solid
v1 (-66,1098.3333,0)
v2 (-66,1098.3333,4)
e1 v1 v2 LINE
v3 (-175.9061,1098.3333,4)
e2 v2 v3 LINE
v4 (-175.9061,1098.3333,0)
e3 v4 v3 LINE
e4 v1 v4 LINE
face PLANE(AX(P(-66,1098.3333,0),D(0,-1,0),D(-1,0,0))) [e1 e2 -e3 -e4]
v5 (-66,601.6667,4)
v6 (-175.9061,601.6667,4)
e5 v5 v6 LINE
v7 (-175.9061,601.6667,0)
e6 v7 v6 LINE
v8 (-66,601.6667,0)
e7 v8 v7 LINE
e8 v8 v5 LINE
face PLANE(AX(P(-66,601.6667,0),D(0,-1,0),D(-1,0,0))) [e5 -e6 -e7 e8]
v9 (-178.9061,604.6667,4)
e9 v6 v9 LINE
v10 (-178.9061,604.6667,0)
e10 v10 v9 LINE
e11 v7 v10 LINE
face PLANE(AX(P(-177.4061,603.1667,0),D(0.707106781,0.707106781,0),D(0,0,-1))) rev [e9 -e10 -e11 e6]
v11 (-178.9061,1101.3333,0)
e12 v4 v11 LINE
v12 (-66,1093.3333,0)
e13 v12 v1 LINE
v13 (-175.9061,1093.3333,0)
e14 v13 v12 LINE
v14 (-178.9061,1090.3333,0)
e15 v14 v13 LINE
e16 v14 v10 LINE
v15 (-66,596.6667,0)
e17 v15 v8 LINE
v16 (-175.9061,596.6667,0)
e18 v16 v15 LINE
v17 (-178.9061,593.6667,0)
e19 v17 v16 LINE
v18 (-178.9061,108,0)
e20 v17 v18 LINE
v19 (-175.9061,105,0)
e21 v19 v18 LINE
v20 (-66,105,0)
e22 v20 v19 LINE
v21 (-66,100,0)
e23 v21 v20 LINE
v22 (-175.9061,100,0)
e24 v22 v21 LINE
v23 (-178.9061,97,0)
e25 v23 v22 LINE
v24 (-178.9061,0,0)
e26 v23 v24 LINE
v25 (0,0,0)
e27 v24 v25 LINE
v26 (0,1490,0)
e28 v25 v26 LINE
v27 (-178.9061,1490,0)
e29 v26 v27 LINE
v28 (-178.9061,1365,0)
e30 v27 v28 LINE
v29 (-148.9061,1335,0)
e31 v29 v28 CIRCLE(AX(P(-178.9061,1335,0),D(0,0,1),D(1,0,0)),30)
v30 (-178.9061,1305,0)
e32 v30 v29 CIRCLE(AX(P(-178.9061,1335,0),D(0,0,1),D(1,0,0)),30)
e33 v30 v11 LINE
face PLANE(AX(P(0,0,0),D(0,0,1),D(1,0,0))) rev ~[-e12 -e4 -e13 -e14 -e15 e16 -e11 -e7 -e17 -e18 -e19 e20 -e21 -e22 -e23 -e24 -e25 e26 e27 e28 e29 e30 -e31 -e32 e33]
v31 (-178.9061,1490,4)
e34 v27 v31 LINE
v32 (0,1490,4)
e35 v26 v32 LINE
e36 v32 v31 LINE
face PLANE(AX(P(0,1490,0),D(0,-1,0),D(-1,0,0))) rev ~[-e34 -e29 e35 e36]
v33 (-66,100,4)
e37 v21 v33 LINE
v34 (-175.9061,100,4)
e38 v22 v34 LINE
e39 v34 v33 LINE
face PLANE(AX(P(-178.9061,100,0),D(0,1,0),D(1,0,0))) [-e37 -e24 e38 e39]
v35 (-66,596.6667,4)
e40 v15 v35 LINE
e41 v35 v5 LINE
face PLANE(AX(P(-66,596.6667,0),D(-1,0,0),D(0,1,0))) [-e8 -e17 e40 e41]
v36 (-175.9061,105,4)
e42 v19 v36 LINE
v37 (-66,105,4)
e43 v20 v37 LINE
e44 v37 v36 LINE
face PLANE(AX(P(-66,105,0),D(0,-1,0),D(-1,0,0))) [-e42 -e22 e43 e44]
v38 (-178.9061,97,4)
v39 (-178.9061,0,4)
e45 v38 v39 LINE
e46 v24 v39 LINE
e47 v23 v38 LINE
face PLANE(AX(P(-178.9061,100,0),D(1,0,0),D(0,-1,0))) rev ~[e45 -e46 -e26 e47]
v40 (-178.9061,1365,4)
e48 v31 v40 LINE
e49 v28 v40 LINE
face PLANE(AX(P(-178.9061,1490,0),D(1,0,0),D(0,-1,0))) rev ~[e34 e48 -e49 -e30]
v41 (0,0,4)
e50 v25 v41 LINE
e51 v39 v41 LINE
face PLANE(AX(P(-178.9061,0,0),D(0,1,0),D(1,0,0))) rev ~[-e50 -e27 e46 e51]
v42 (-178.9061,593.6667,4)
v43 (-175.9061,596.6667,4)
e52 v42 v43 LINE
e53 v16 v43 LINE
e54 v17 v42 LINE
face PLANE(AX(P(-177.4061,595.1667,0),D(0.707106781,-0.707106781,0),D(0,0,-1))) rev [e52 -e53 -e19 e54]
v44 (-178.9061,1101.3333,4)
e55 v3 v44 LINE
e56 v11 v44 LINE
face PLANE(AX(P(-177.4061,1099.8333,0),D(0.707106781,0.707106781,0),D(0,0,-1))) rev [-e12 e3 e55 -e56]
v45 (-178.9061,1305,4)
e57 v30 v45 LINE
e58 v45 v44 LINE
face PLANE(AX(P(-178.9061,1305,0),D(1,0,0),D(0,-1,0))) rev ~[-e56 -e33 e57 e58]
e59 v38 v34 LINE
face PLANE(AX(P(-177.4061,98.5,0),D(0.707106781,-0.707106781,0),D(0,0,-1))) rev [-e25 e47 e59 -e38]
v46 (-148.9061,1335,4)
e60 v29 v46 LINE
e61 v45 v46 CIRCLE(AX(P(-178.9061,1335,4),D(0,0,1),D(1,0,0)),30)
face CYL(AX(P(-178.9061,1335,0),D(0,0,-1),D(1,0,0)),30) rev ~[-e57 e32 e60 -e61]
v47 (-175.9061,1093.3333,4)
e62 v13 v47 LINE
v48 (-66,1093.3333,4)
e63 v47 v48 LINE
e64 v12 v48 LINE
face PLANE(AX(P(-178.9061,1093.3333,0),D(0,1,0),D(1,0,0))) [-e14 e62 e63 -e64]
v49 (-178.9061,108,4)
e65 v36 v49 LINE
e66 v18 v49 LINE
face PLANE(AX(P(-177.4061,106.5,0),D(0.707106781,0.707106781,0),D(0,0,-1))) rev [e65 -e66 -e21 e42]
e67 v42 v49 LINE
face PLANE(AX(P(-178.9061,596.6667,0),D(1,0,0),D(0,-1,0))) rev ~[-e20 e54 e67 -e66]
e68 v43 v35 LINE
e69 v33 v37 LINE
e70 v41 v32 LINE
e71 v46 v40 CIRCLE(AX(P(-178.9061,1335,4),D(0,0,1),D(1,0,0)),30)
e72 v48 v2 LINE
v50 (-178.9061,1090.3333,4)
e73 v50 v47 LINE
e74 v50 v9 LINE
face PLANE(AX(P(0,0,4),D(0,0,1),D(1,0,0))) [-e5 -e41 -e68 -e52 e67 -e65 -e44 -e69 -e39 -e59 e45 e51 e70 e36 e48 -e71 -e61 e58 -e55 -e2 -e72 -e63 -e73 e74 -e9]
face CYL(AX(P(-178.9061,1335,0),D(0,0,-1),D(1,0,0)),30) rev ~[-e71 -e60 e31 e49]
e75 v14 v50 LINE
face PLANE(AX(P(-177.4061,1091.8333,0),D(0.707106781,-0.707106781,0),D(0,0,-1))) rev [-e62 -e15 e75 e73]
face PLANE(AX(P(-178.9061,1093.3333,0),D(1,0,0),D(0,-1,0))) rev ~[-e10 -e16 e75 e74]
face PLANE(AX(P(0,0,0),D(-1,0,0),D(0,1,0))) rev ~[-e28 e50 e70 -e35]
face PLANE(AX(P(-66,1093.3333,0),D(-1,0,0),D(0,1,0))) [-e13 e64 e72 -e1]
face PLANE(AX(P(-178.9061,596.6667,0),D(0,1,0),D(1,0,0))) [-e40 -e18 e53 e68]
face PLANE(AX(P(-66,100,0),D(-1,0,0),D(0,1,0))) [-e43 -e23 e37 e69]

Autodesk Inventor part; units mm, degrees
ref_plane "YZ Plane" through (0, 0, 0) normal (1, 0, 0) x (0, 1, 0)
ref_plane "XZ Plane" through (0, 0, 0) normal (0, 1, 0) x (-1, 0, 0)
ref_plane "XY Plane" through (0, 0, 0) normal (0, 0, 1) x (1, 0, 0)
sketch "Sketch1" plane through (0, 0, 0) normal (0, 0, 1) x (1, 0, 0)
  line L0 (0, 1490) -> (-178.9061, 1490)
  line L1 (-178.9061, 1490) -> (-178.9061, 0)
  line L2 (-178.9061, 0) -> (0, 0)
  line L3 (0, 0) -> (0, 1490)
  line L4 (-178.9061, 100) -> (-66, 100)
  line L5 (-66, 100) -> (-66, 105)
  line L6 (-66, 105) -> (-178.9061, 105)
  line L7 (-178.9061, 105) -> (-178.9061, 100)
  line L8 (-178.9061, 596.6667) -> (-66, 596.6667)
  line L9 (-66, 596.6667) -> (-66, 601.6667)
  line L10 (-66, 601.6667) -> (-178.9061, 601.6667)
  line L11 (-178.9061, 601.6667) -> (-178.9061, 596.6667)
  line L12 (-178.9061, 1093.3333) -> (-66, 1093.3333)
  line L13 (-66, 1093.3333) -> (-66, 1098.3333)
  line L14 (-66, 1098.3333) -> (-178.9061, 1098.3333)
  line L15 (-178.9061, 1098.3333) -> (-178.9061, 1093.3333)
  circle A0 centre (-178.9061, 1335) radius 30
  point P0 (-178.9061, 1098.3333)
  point P1 (-178.9061, 1093.3333)
  point P2 (-178.9061, 596.6667)
  point P3 (-178.9061, 105)
  point P4 (-178.9061, 1365)
  point P5 (-178.9061, 1305)
  dimension "d0" = 1490
  dimension "d1" = 178.9061
  dimension "d2" = 5
  dimension "d4" = 100
  dimension "d7" = 496.6667
  dimension "d23" = 66
  dimension "d29" = 60
  dimension "d30" = 1335
extrude "Plate1" add sketch "Sketch1" along normal blind 4 contours L3 L2 L1 L4 L5 L6 L8 L9 L10 L12 L13 L14 A0 L0
chamfer "Corner Chamfer1" distance 3 angle 45 6 edges at (-178.9061, 100, 2) (-178.9061, 105, 2) (-178.9061, 596.6667, 2) (-178.9061, 601.6667, 2) (-178.9061, 1098.3333, 2) (-178.9061, 1093.3333, 2)
equation "\"d0\" = Стрингер_длина"
equation "\"d1\" = стрингер_глубина_2"
equation "\"d2\" = паз_под_стрингер_толщина"
equation "\"d7\" = Шаг_шпангоутов"
equation "\"d23\" = паз_под_стрингер_глубина - Thickness"
equation "\"d29\" = 2 * радиус_выреза_под_сварку"
equation "\"d12\" = Thickness"
equation "\"BendRadius\" = Thickness"
equation "\"BendReliefWidth\" = Thickness"
equation "\"BendReliefDepth\" = 0.5 * Thickness"
equation "\"CornerReliefSize\" = 4 * Thickness"
equation "\"MinimumRemnant\" = 2 * Thickness"
equation "\"TransitionRadius\" = BendRadius"
equation "\"JacobiRadiusSize\" = BendRadius"
equation "\"GapSize\" = Thickness"
equation "\"Стрингер_длина\" = 1490"
equation "\"стрингер_глубина_2\" = 178.906141"
equation "\"паз_под_стрингер_толщина\" = 5"
equation "\"Шаг_шпангоутов\" = 496.666667"
equation "\"паз_под_стрингер_глубина\" = 70"
equation "\"Thickness\" = 4"
equation "\"радиус_выреза_под_сварку\" = 30"
properties part number "0414 GBK stringer C2" material "Steel"
